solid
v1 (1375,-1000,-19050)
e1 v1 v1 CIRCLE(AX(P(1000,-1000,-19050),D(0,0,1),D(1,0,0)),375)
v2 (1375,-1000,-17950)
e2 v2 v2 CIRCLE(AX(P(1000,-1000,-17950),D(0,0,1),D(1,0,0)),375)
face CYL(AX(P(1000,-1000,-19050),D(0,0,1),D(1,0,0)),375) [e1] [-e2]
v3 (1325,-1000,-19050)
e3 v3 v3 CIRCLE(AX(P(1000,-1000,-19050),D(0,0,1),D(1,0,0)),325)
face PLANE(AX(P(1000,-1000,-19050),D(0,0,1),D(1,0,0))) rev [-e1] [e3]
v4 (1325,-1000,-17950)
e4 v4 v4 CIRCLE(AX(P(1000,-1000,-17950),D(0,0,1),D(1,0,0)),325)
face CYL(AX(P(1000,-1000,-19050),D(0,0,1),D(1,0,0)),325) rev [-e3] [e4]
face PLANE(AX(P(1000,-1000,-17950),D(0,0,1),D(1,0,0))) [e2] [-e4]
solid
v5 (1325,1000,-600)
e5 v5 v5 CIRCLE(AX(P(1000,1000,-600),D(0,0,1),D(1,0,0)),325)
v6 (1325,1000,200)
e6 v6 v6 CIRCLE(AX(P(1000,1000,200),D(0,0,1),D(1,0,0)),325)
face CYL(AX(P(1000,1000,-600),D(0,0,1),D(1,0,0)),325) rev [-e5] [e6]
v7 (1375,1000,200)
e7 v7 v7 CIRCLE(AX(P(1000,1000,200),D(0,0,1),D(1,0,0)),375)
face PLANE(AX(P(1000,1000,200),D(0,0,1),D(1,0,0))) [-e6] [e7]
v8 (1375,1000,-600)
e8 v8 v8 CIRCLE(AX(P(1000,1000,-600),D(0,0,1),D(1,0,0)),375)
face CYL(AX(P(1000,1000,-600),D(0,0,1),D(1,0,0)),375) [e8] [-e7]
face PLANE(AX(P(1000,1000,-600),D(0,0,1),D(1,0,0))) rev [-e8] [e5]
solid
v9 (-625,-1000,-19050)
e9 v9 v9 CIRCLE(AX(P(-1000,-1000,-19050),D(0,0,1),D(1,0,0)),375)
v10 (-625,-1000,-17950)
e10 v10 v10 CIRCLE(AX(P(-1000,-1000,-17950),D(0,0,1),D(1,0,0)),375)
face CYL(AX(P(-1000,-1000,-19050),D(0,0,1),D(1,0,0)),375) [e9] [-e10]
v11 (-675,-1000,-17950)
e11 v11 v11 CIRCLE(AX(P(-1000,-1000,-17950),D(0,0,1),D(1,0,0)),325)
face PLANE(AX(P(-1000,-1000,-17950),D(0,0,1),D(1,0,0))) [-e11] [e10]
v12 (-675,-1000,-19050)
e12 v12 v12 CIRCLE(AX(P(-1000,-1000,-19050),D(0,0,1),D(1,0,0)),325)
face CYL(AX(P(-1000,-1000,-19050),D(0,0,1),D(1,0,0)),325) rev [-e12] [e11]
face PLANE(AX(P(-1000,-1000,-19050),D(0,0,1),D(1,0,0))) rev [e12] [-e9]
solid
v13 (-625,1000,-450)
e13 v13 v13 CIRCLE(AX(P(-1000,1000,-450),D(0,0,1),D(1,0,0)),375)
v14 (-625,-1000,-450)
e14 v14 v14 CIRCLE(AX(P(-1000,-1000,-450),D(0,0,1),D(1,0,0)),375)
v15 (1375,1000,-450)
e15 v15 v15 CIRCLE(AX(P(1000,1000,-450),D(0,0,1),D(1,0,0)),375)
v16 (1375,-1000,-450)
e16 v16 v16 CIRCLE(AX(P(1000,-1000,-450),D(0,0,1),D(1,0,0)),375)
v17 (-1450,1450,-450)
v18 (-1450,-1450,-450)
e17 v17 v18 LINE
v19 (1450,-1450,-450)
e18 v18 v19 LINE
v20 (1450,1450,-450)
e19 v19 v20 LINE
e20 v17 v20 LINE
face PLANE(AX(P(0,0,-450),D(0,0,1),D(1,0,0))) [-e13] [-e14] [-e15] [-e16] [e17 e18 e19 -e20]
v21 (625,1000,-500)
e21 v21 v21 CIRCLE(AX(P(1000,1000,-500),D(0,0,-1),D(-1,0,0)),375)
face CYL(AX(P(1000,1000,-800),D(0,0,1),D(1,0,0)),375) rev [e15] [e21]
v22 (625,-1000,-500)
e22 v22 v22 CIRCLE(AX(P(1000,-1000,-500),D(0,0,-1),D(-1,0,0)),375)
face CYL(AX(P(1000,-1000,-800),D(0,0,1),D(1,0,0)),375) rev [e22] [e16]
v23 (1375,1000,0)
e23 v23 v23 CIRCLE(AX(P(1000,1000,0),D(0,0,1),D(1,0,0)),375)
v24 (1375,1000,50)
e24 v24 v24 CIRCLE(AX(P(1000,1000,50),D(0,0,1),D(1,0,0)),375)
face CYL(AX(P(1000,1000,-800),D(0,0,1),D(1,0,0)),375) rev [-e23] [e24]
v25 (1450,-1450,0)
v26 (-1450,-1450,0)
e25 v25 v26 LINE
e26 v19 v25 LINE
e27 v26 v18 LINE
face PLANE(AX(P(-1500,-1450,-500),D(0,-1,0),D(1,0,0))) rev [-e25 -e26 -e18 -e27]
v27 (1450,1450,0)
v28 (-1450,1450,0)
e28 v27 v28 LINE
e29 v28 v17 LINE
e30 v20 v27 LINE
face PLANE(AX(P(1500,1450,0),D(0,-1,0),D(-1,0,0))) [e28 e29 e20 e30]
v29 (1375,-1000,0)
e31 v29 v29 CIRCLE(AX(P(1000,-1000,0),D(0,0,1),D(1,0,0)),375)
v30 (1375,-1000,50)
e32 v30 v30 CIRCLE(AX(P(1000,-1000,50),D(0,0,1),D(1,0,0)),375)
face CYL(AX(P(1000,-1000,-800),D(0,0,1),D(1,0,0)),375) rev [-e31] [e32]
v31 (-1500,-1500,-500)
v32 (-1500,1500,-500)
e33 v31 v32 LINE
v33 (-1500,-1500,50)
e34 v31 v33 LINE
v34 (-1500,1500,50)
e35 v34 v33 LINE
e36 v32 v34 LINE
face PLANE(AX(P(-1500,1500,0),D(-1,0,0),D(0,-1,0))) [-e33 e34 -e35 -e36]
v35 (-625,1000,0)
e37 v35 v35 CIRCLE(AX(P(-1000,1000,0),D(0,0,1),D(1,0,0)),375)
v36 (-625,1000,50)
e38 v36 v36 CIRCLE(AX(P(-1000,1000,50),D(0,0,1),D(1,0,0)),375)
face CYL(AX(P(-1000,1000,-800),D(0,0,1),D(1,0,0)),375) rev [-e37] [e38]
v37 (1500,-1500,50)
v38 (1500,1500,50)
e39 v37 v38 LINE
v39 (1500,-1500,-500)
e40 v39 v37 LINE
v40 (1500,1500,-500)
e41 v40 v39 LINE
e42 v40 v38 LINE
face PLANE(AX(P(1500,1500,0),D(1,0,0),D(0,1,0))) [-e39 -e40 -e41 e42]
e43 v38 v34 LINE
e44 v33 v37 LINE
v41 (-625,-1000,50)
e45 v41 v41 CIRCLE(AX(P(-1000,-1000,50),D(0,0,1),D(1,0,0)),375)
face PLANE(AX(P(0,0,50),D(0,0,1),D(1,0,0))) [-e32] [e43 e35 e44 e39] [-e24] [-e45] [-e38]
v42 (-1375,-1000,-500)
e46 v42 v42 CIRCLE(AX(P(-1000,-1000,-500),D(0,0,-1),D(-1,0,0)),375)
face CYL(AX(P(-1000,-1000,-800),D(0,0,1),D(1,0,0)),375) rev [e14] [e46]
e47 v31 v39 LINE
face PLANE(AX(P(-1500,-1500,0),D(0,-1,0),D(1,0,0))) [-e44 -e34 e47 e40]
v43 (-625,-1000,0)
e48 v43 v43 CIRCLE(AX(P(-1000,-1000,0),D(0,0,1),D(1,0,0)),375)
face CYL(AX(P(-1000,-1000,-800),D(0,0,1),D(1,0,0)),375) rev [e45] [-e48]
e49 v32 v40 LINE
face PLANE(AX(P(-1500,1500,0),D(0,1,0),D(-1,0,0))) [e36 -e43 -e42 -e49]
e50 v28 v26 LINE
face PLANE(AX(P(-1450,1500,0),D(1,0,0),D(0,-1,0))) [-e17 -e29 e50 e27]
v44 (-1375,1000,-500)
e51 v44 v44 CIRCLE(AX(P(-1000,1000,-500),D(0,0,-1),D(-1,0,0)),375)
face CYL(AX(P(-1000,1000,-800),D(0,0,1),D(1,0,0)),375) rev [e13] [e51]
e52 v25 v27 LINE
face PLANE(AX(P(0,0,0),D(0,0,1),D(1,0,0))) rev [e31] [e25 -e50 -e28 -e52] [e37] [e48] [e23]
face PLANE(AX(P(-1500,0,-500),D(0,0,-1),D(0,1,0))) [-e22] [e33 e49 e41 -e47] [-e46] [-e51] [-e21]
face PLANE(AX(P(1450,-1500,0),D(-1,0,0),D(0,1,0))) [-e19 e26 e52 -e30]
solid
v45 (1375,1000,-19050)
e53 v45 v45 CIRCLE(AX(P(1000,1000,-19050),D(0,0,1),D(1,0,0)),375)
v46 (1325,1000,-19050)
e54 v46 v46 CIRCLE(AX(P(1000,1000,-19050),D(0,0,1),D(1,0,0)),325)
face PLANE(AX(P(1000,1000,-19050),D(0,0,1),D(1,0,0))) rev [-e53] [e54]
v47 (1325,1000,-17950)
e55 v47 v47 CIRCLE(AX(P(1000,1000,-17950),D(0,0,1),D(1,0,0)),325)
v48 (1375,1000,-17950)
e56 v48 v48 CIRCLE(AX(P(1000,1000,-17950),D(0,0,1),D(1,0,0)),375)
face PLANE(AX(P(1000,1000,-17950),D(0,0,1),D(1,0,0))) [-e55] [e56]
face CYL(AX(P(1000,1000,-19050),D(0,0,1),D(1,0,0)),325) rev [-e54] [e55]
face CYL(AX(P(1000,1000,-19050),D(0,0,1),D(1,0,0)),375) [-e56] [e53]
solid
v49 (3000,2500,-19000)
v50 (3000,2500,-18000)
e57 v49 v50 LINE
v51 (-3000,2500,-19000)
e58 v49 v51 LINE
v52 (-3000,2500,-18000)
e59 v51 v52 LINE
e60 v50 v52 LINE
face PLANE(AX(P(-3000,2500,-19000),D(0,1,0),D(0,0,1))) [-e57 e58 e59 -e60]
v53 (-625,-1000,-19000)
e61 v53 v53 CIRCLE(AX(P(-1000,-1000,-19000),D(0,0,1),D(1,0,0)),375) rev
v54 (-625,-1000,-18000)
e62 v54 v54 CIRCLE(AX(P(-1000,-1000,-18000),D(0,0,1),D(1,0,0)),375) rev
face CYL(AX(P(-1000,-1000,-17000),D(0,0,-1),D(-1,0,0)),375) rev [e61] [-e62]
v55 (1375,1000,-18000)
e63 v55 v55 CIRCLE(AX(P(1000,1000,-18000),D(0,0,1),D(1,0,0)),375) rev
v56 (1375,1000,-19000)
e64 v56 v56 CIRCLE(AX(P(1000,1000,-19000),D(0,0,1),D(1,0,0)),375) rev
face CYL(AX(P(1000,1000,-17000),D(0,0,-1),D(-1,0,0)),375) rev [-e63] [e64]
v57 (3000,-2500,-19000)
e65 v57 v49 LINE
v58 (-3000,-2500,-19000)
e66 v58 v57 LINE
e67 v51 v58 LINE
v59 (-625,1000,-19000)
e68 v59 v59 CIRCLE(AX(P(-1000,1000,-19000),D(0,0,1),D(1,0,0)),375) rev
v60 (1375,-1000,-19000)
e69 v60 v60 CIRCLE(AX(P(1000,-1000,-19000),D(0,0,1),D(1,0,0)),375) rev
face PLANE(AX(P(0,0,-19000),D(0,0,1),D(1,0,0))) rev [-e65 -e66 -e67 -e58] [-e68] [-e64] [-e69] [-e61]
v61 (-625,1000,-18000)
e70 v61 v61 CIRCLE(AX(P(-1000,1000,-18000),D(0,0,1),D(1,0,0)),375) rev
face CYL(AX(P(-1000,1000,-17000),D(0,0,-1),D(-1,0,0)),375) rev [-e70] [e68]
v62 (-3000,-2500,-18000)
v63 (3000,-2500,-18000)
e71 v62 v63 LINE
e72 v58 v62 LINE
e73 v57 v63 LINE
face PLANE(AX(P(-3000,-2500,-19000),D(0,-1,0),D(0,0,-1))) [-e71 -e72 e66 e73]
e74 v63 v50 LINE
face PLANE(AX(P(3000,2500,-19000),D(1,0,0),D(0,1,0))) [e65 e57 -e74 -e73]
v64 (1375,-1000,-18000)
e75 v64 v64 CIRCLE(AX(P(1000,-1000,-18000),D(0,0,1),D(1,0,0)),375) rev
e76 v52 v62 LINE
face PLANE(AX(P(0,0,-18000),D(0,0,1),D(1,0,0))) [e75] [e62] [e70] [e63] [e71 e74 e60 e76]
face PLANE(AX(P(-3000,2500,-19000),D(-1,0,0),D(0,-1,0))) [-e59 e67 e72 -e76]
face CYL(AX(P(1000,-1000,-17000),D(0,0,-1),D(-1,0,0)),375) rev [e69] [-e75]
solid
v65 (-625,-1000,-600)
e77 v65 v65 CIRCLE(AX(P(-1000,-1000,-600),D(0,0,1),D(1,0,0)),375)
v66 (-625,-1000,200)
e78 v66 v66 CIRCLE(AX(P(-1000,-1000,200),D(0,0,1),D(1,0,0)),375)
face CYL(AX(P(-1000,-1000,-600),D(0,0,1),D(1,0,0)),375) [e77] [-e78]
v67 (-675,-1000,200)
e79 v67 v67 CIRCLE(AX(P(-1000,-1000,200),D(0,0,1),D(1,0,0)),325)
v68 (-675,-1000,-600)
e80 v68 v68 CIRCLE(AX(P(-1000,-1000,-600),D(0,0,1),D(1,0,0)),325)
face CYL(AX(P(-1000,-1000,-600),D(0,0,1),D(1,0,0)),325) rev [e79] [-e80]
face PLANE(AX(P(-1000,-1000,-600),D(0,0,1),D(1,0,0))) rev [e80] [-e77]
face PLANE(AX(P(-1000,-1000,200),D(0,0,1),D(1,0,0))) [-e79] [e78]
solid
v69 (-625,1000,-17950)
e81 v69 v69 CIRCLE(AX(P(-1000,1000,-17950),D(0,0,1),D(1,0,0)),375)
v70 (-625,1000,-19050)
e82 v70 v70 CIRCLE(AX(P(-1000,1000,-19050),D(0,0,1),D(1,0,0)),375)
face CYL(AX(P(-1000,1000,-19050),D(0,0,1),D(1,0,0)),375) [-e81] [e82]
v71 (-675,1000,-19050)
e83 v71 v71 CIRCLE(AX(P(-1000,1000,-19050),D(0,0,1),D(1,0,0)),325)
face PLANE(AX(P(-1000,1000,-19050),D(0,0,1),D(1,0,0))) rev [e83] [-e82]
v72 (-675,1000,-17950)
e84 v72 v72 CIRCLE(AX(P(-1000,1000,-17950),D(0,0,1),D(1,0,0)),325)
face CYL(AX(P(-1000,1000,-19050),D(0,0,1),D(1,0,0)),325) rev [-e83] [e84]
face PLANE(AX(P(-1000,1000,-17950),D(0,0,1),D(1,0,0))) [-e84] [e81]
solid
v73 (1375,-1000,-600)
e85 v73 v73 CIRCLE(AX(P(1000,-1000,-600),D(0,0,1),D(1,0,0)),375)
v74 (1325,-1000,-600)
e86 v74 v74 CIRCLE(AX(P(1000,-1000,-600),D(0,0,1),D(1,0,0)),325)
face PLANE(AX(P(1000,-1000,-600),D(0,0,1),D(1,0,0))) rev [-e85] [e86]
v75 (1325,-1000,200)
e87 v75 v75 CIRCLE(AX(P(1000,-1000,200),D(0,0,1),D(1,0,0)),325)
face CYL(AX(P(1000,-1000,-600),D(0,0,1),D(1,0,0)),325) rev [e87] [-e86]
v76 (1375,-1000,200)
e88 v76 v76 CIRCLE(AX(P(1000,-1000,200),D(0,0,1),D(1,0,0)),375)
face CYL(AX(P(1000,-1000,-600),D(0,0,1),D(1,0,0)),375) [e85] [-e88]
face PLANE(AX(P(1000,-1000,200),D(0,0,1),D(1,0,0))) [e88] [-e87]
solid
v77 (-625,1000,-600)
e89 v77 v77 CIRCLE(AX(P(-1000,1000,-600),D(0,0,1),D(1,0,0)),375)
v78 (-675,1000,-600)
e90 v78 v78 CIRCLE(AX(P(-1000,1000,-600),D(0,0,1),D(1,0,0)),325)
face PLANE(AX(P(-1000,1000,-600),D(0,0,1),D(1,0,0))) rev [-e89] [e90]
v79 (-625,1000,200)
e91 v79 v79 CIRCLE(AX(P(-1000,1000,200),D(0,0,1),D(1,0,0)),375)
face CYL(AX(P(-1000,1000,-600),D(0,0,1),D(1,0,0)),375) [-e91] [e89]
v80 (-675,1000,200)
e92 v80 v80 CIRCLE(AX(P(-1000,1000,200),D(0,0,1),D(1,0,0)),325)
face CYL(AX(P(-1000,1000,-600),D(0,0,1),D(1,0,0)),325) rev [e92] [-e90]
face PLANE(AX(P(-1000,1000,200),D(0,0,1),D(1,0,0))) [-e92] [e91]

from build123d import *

# Parameters (mm, degrees)
THICKEN1_START       = -1500
THICKEN1_OUTLINE_W   = 3000
THICKEN1_OUTLINE_H   = 50
THICKEN1_DEPTH       = 3000
THICKEN2_START       = -1500
THICKEN2_OUTLINE_W   = 3000
THICKEN2_OUTLINE_H   = 500
THICKEN2_DEPTH       = 50
THICKEN3_START       = 1450
THICKEN3_OUTLINE_W   = 3000
THICKEN3_OUTLINE_H   = 500
THICKEN3_DEPTH       = 50
THICKEN4_START       = -1500
THICKEN4_OUTLINE_W   = 2900
THICKEN4_OUTLINE_H   = 50
THICKEN4_DEPTH       = 3000
THICKEN6_START       = -1500
THICKEN6_OUTLINE_W   = 2900
THICKEN6_OUTLINE_H   = 450
THICKEN6_DEPTH       = 50
THICKEN8_START       = 1450
THICKEN8_OUTLINE_W   = 2900
THICKEN8_OUTLINE_H   = 450
THICKEN8_DEPTH       = 50
SKETCH3_W            = 6000
SKETCH3_H            = 5000
BOSS_EXTRUDE1_DEPTH  = 1000
CUT_EXTRUDE3_START   = -20000
SKETCH2_R            = 325
CUT_EXTRUDE3_DEPTH   = 21000
LPATTERN2_COUNT      = 2
LPATTERN2_PITCH      = 2000
LPATTERN2_COUNT_DIR2 = 2
LPATTERN2_PITCH_DIR2 = 2000
SKETCH18_R           = 375
CUT_EXTRUDE5_DEPTH   = 1000
LPATTERN3_COUNT      = 2
LPATTERN3_PITCH      = 2000
LPATTERN3_COUNT_DIR2 = 2
LPATTERN3_PITCH_DIR2 = 2000
CUT_EXTRUDE6_START   = 1000
SKETCH19_R           = 375
CUT_EXTRUDE6_DEPTH   = 2200
LPATTERN4_COUNT      = 2
LPATTERN4_PITCH      = 2000
LPATTERN4_COUNT_DIR2 = 2
LPATTERN4_PITCH_DIR2 = 2000
BOSS_EXTRUDE2_START  = -1050
SKETCH20_R           = 375
SKETCH20_R_2         = 325
BOSS_EXTRUDE2_DEPTH  = 1100
LPATTERN5_COUNT      = 2
LPATTERN5_PITCH      = 2000
LPATTERN5_COUNT_DIR2 = 2
LPATTERN5_PITCH_DIR2 = 2000
SKETCH21_R           = 375
SKETCH21_R_2         = 325
BOSS_EXTRUDE3_DEPTH  = 800
LPATTERN6_COUNT      = 2
LPATTERN6_PITCH      = 2000
LPATTERN6_COUNT_DIR2 = 2
LPATTERN6_PITCH_DIR2 = 2000


# Read off the part's stored shape, not the designer's step: Thicken1, Thicken2, Thicken3, Thicken4, Thicken6, Thicken8
with BuildPart() as part:
    # Thicken1 outline → Thicken1 (new body)
    with BuildSketch(Plane.YZ.offset(THICKEN1_START)):
        with Locations((0, 25)):
            Rectangle(THICKEN1_OUTLINE_W, THICKEN1_OUTLINE_H)
    extrude(amount=THICKEN1_DEPTH)

    # Thicken2 outline → Thicken2 (add)
    with BuildSketch(Plane.YZ.offset(THICKEN2_START)):
        with Locations((0, -250)):
            Rectangle(THICKEN2_OUTLINE_W, THICKEN2_OUTLINE_H)
    extrude(amount=THICKEN2_DEPTH)

    # Thicken3 outline → Thicken3 (add)
    with BuildSketch(Plane.YZ.offset(THICKEN3_START)):
        with Locations((0, -250)):
            Rectangle(THICKEN3_OUTLINE_W, THICKEN3_OUTLINE_H)
    extrude(amount=THICKEN3_DEPTH)

    # Thicken4 outline → Thicken4 (add)
    with BuildSketch(Plane(origin=(0, 0, 0), x_dir=(1, 0, 0), z_dir=(0, 1, 0)).offset(THICKEN4_START)):
        with Locations((0, 475)):
            Rectangle(THICKEN4_OUTLINE_W, THICKEN4_OUTLINE_H)
    extrude(amount=THICKEN4_DEPTH)

    # Thicken6 outline → Thicken6 (add)
    with BuildSketch(Plane(origin=(0, 0, 0), x_dir=(1, 0, 0), z_dir=(0, 1, 0)).offset(THICKEN6_START)):
        with Locations((0, 225)):
            Rectangle(THICKEN6_OUTLINE_W, THICKEN6_OUTLINE_H)
    extrude(amount=THICKEN6_DEPTH)

    # Thicken8 outline → Thicken8 (add)
    with BuildSketch(Plane(origin=(0, 0, 0), x_dir=(1, 0, 0), z_dir=(0, 1, 0)).offset(THICKEN8_START)):
        with Locations((0, 225)):
            Rectangle(THICKEN8_OUTLINE_W, THICKEN8_OUTLINE_H)
    extrude(amount=THICKEN8_DEPTH)


with BuildPart() as body_2:
    # Sketch3 → Boss-Extrude1 (new body)
    with BuildSketch(Plane.XY.offset(-18000)):
        Rectangle(SKETCH3_W, SKETCH3_H)
    extrude(amount=-BOSS_EXTRUDE1_DEPTH)


with BuildPart() as cut_extrude3_tool:
    # Sketch2 → Cut-Extrude3 (new body)
    with BuildSketch(Plane.XY.offset(CUT_EXTRUDE3_START)):
        with Locations((1000, 1000)):
            Circle(SKETCH2_R)
    cut_extrude3 = extrude(amount=CUT_EXTRUDE3_DEPTH)


with BuildPart() as part_1:
    add(part.part)

    # Cut-Extrude3: cut by cut_extrude3_tool
    add(cut_extrude3_tool.part, mode=Mode.SUBTRACT)


with BuildPart() as body_2_1:
    add(body_2.part)

    # Cut-Extrude3: cut by cut_extrude3_tool
    add(cut_extrude3_tool.part, mode=Mode.SUBTRACT)


with BuildPart() as lpattern2_tool:
    # LPattern2: Cut-Extrude3 2 × 2
    with Locations(*[(-i * LPATTERN2_PITCH, -j * LPATTERN2_PITCH_DIR2, 0) for i in range(LPATTERN2_COUNT) for j in range(LPATTERN2_COUNT_DIR2) if (i, j) != (0, 0)]):
        add(cut_extrude3)


with BuildPart() as part_2:
    add(part_1.part)

    # LPattern2: cut by lpattern2_tool
    add(lpattern2_tool.part, mode=Mode.SUBTRACT)

    # Sketch18 → Cut-Extrude5 (cut)
    with BuildSketch(Plane.XY.offset(200)):
        with Locations((1000, 1000)):
            Circle(SKETCH18_R)
    cut_extrude5 = extrude(amount=-CUT_EXTRUDE5_DEPTH, mode=Mode.SUBTRACT)

    # LPattern3: Cut-Extrude5 2 × 2
    with Locations(*[(-i * LPATTERN3_PITCH, -j * LPATTERN3_PITCH_DIR2, 0) for i in range(LPATTERN3_COUNT) for j in range(LPATTERN3_COUNT_DIR2) if (i, j) != (0, 0)]):
        add(cut_extrude5, mode=Mode.SUBTRACT)


with BuildPart() as body_2_2:
    add(body_2_1.part)

    # LPattern2: cut by lpattern2_tool
    add(lpattern2_tool.part, mode=Mode.SUBTRACT)

    # Sketch19 → Cut-Extrude6 (cut)
    with BuildSketch(Plane.XY.offset(-18000).offset(CUT_EXTRUDE6_START)):
        with Locations((1000, 1000)):
            Circle(SKETCH19_R)
    cut_extrude6 = extrude(amount=-CUT_EXTRUDE6_DEPTH, mode=Mode.SUBTRACT)

    # LPattern4: Cut-Extrude6 2 × 2
    with Locations(*[(-i * LPATTERN4_PITCH, -j * LPATTERN4_PITCH_DIR2, 0) for i in range(LPATTERN4_COUNT) for j in range(LPATTERN4_COUNT_DIR2) if (i, j) != (0, 0)]):
        add(cut_extrude6, mode=Mode.SUBTRACT)


with BuildPart() as body_3:
    # Sketch20 → Boss-Extrude2 (new body)
    with BuildSketch(Plane.XY.offset(-18000).offset(BOSS_EXTRUDE2_START)):
        with Locations((1000, 1000)):
            Circle(SKETCH20_R)
        with Locations((1000, 1000)):
            Circle(SKETCH20_R_2, mode=Mode.SUBTRACT)
    boss_extrude2 = extrude(amount=BOSS_EXTRUDE2_DEPTH)


with BuildPart() as lpattern5_1:
    # LPattern5: Boss-Extrude2 2 × 2
    with Locations(*[(-i * LPATTERN5_PITCH, -j * LPATTERN5_PITCH_DIR2, 0) for i in range(LPATTERN5_COUNT) for j in range(LPATTERN5_COUNT_DIR2) if (i, j) != (0, 0)]):
        add(boss_extrude2)


with BuildPart() as body_7:
    # Sketch21 → Boss-Extrude3 (new body)
    with BuildSketch(Plane.XY.offset(200)):
        with Locations((1000, 1000)):
            Circle(SKETCH21_R)
        with Locations((1000, 1000)):
            Circle(SKETCH21_R_2, mode=Mode.SUBTRACT)
    boss_extrude3 = extrude(amount=-BOSS_EXTRUDE3_DEPTH)


with BuildPart() as lpattern6_1:
    # LPattern6: Boss-Extrude3 2 × 2
    with Locations(*[(-j * LPATTERN6_PITCH_DIR2, -i * LPATTERN6_PITCH, 0) for i in range(LPATTERN6_COUNT) for j in range(LPATTERN6_COUNT_DIR2) if (i, j) != (0, 0)]):
        add(boss_extrude3)


solid = Compound([part_2.part, body_2_2.part, body_3.part, lpattern5_1.part, body_7.part, lpattern6_1.part])
